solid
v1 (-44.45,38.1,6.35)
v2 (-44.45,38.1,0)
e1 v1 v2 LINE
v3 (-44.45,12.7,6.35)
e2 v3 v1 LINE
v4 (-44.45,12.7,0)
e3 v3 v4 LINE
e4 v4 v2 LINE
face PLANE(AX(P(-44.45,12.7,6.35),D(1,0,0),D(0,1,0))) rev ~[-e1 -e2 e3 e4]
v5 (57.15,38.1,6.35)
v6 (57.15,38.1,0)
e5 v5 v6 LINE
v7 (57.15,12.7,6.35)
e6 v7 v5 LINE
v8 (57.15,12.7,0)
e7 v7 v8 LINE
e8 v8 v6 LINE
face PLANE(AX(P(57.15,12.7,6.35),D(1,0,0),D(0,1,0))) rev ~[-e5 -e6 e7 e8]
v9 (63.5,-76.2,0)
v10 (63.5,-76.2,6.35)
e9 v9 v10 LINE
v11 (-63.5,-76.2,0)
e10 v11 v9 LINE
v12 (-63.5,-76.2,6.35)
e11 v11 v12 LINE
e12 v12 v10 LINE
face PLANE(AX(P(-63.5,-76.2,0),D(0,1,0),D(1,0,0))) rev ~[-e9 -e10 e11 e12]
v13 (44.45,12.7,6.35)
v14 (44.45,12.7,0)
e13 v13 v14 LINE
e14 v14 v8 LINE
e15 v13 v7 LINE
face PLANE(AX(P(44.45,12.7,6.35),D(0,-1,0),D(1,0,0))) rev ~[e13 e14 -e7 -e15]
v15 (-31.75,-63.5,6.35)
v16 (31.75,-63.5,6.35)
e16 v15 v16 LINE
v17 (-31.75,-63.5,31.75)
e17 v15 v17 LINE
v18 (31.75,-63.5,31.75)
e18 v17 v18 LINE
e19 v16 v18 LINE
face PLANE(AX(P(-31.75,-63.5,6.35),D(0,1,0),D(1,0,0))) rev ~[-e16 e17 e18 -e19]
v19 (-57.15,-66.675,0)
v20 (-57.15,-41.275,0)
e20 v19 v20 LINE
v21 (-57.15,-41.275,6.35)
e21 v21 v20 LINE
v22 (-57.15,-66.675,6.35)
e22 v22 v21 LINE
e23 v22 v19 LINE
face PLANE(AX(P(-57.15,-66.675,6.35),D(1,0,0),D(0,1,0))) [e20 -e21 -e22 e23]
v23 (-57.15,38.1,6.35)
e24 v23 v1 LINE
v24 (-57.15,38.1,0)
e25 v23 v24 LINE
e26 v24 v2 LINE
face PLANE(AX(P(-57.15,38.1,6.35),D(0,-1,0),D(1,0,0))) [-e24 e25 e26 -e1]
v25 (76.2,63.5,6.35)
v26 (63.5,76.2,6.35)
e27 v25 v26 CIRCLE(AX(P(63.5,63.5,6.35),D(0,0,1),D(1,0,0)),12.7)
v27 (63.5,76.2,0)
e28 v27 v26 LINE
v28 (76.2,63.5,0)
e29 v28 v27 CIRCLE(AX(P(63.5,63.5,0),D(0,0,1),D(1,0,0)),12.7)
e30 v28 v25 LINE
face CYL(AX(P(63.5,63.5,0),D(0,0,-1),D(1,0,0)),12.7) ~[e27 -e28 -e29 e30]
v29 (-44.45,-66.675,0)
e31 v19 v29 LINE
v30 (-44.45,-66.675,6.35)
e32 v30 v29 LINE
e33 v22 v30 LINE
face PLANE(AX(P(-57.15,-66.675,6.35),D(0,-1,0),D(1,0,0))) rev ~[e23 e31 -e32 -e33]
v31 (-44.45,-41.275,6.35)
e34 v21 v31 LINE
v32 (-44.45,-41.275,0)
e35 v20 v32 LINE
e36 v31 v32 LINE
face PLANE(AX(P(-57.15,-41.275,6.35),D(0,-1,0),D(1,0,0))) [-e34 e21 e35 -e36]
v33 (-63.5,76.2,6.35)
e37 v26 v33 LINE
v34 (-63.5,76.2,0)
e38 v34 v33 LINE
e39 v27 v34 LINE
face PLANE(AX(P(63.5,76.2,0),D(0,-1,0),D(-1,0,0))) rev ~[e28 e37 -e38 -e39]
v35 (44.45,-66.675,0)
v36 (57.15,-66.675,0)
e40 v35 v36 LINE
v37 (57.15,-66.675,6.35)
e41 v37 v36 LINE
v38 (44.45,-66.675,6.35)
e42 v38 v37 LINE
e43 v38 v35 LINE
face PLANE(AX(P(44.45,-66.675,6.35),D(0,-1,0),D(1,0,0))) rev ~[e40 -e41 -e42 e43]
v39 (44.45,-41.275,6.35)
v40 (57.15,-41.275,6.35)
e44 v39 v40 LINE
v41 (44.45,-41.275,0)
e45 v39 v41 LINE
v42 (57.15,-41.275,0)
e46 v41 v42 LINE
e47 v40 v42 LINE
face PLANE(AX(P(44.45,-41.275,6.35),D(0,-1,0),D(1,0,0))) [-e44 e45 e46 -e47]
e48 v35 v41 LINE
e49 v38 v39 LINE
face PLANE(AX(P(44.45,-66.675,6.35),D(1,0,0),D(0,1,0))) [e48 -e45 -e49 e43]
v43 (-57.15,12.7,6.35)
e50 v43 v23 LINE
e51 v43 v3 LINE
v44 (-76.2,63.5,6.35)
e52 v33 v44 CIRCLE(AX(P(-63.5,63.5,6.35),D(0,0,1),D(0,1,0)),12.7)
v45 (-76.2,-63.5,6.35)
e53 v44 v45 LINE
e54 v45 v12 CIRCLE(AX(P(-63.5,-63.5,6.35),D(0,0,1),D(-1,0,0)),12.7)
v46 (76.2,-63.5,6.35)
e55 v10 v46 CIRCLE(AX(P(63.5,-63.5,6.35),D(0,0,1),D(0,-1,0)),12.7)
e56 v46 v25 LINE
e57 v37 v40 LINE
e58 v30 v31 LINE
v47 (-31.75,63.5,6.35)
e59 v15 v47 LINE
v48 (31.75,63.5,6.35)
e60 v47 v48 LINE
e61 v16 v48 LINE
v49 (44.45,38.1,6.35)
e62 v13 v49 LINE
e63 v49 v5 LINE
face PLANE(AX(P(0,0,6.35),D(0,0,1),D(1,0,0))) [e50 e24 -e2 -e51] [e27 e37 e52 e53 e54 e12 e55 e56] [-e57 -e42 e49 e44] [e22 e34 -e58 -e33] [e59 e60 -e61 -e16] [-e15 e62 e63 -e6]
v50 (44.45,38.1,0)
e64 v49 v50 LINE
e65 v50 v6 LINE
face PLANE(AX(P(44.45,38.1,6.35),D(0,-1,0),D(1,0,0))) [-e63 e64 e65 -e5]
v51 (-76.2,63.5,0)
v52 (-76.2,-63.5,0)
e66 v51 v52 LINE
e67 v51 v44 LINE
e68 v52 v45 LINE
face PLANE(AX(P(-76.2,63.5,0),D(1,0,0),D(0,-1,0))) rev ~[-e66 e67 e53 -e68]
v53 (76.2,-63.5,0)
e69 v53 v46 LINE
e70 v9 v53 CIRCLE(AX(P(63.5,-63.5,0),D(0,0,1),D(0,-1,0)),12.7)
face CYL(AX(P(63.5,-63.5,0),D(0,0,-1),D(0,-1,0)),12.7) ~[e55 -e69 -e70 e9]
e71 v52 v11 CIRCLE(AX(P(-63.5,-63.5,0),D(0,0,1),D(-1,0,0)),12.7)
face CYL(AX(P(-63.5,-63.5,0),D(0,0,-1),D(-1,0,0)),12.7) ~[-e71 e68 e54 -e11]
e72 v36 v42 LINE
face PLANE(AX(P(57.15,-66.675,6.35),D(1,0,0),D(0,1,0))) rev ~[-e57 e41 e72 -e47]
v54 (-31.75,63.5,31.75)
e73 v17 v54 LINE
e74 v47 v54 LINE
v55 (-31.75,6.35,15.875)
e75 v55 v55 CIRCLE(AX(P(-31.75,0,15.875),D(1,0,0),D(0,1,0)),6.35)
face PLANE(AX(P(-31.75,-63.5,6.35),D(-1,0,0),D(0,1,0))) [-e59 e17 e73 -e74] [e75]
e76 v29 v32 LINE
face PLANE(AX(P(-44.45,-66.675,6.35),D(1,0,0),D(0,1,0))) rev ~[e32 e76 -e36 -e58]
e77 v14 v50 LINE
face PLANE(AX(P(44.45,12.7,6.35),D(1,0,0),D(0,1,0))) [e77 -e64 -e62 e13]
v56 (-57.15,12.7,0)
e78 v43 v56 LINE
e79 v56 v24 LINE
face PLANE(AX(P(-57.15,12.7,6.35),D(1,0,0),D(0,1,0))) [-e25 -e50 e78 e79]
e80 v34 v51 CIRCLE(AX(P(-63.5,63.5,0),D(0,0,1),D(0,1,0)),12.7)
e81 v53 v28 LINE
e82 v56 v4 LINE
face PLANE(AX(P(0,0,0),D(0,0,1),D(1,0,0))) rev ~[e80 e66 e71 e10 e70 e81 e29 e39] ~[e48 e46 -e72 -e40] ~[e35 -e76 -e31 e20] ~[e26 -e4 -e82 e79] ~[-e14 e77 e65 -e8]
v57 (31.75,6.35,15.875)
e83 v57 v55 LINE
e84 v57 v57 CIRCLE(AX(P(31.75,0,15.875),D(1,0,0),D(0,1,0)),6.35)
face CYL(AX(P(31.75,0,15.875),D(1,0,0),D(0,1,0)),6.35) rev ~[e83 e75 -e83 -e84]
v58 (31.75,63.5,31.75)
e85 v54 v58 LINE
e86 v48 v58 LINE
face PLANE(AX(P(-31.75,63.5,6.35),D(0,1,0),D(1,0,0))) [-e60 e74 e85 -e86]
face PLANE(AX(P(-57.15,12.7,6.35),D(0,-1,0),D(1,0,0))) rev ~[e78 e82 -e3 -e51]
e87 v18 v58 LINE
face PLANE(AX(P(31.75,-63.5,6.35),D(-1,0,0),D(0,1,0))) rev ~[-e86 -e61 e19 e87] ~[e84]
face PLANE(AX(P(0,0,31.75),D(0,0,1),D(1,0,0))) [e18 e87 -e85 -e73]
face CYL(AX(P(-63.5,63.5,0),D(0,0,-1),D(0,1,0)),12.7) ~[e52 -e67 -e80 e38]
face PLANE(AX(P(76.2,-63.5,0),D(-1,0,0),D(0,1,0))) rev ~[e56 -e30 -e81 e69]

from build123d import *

# Parameters (mm, degrees)
F2_DEPTH = 6.35
F3_W     = 63.5
F3_H     = 127
F4_DEPTH = 25.4
F5_R     = 6.35
F6_DEPTH = 63.5
F7_W     = 12.7
F7_H     = 25.4
F8_DEPTH = 6.35


# Not quite as in the source:
# - the program builds the solid bodies; features that only make, move or delete a surface that nothing else refers to are left out


with BuildPart() as f2:
    # F0 (on Top) → F2 (new body)
    with BuildSketch(Plane.XY):
        with BuildLine():
            Line((63.5, 76.2), (-63.5, 76.2))
            ThreePointArc((-63.5, 76.2), (-72.4802561211, 72.4802561211), (-76.2, 63.5))
            Line((-76.2, 63.5), (-76.2, -63.5))
            ThreePointArc((-76.2, -63.5), (-72.4802561211, -72.4802561211), (-63.5, -76.2))
            Line((-63.5, -76.2), (63.5, -76.2))
            ThreePointArc((63.5, -76.2), (72.4802561211, -72.4802561211), (76.2, -63.5))
            Line((76.2, -63.5), (76.2, 63.5))
            ThreePointArc((76.2, 63.5), (72.4802561211, 72.4802561211), (63.5, 76.2))
        make_face()
        with BuildLine():
            ThreePointArc((-69.85, 57.15), (-66.1302561211, 66.1302561211), (-57.15, 69.85))
            Line((-57.15, 69.85), (-1.846e-07, 69.85))
            Line((-1.846e-07, 69.85), (57.15, 69.85))
            ThreePointArc((57.15, 69.85), (66.1302561211, 66.1302561211), (69.85, 57.15))
            Line((69.85, 57.15), (69.85, 0))
            Line((69.85, 0), (69.85, -57.15))
            ThreePointArc((69.85, -57.15), (66.1302561211, -66.1302561211), (57.15, -69.85))
            Line((57.15, -69.85), (0, -69.85))
            Line((0, -69.85), (-57.15, -69.85))
            ThreePointArc((-57.15, -69.85), (-66.1302561211, -66.1302561211), (-69.85, -57.15))
            Line((-69.85, -57.15), (-69.85, -1.807e-07))
            Line((-69.85, -1.807e-07), (-69.85, 57.15))
        make_face(mode=Mode.SUBTRACT)
        with BuildLine():
            ThreePointArc((69.85, 0), (49.3914086006, 49.3914087312), (-1.846e-07, 69.85))
            ThreePointArc((-1.846e-07, 69.85), (-49.3914087951, 49.3914085367), (-69.85, -1.807e-07))
            ThreePointArc((-69.85, -1.807e-07), (-49.391408602, -49.3914087298), (0, -69.85))
            ThreePointArc((0, -69.85), (49.3914086659, -49.3914086659), (69.85, 0))
        make_face()
        with BuildLine():
            Line((57.15, 69.85), (-1.846e-07, 69.85))
            ThreePointArc((-1.846e-07, 69.85), (49.3914086006, 49.3914087312), (69.85, 0))
            Line((69.85, 0), (69.85, 57.15))
            ThreePointArc((69.85, 57.15), (66.1302561211, 66.1302561211), (57.15, 69.85))
        make_face()
        with BuildLine():
            Line((-1.846e-07, 69.85), (-57.15, 69.85))
            ThreePointArc((-57.15, 69.85), (-66.1302561211, 66.1302561211), (-69.85, 57.15))
            Line((-69.85, 57.15), (-69.85, -1.807e-07))
            ThreePointArc((-69.85, -1.807e-07), (-49.3914087951, 49.3914085367), (-1.846e-07, 69.85))
        make_face()
        with BuildLine():
            Line((69.85, -57.15), (69.85, 0))
            ThreePointArc((69.85, 0), (49.3914086659, -49.3914086659), (0, -69.85))
            Line((0, -69.85), (57.15, -69.85))
            ThreePointArc((57.15, -69.85), (66.1302561211, -66.1302561211), (69.85, -57.15))
        make_face()
        with BuildLine():
            ThreePointArc((0, -69.85), (-49.391408602, -49.3914087298), (-69.85, -1.807e-07))
            Line((-69.85, -1.807e-07), (-69.85, -57.15))
            ThreePointArc((-69.85, -57.15), (-66.1302561211, -66.1302561211), (-57.15, -69.85))
            Line((-57.15, -69.85), (0, -69.85))
        make_face()
    extrude(amount=F2_DEPTH)

    # F3 (on face) → F4 (join)
    with BuildSketch(Plane.XY.offset(6.35)):
        Rectangle(F3_W, F3_H)
    extrude(amount=F4_DEPTH)

    # F5 (on face) → F6 (cut)
    with BuildSketch(Plane.YZ.offset(31.75)):
        with Locations((0, 15.875)):
            Circle(F5_R)
    extrude(amount=-F6_DEPTH, mode=Mode.SUBTRACT)

    # F7 (on face) → F8 (cut)
    with BuildSketch(Plane.XY.offset(6.35)):
        with Locations((50.8, 25.4)):
            Rectangle(F7_W, F7_H)
        with Locations((-50.8, 25.4)):
            Rectangle(F7_W, F7_H)
        with Locations((-50.8, -53.975)):
            Rectangle(F7_W, F7_H)
        with Locations((50.8, -53.975)):
            Rectangle(F7_W, F7_H)
    extrude(amount=-F8_DEPTH, mode=Mode.SUBTRACT)


solid = f2.part
